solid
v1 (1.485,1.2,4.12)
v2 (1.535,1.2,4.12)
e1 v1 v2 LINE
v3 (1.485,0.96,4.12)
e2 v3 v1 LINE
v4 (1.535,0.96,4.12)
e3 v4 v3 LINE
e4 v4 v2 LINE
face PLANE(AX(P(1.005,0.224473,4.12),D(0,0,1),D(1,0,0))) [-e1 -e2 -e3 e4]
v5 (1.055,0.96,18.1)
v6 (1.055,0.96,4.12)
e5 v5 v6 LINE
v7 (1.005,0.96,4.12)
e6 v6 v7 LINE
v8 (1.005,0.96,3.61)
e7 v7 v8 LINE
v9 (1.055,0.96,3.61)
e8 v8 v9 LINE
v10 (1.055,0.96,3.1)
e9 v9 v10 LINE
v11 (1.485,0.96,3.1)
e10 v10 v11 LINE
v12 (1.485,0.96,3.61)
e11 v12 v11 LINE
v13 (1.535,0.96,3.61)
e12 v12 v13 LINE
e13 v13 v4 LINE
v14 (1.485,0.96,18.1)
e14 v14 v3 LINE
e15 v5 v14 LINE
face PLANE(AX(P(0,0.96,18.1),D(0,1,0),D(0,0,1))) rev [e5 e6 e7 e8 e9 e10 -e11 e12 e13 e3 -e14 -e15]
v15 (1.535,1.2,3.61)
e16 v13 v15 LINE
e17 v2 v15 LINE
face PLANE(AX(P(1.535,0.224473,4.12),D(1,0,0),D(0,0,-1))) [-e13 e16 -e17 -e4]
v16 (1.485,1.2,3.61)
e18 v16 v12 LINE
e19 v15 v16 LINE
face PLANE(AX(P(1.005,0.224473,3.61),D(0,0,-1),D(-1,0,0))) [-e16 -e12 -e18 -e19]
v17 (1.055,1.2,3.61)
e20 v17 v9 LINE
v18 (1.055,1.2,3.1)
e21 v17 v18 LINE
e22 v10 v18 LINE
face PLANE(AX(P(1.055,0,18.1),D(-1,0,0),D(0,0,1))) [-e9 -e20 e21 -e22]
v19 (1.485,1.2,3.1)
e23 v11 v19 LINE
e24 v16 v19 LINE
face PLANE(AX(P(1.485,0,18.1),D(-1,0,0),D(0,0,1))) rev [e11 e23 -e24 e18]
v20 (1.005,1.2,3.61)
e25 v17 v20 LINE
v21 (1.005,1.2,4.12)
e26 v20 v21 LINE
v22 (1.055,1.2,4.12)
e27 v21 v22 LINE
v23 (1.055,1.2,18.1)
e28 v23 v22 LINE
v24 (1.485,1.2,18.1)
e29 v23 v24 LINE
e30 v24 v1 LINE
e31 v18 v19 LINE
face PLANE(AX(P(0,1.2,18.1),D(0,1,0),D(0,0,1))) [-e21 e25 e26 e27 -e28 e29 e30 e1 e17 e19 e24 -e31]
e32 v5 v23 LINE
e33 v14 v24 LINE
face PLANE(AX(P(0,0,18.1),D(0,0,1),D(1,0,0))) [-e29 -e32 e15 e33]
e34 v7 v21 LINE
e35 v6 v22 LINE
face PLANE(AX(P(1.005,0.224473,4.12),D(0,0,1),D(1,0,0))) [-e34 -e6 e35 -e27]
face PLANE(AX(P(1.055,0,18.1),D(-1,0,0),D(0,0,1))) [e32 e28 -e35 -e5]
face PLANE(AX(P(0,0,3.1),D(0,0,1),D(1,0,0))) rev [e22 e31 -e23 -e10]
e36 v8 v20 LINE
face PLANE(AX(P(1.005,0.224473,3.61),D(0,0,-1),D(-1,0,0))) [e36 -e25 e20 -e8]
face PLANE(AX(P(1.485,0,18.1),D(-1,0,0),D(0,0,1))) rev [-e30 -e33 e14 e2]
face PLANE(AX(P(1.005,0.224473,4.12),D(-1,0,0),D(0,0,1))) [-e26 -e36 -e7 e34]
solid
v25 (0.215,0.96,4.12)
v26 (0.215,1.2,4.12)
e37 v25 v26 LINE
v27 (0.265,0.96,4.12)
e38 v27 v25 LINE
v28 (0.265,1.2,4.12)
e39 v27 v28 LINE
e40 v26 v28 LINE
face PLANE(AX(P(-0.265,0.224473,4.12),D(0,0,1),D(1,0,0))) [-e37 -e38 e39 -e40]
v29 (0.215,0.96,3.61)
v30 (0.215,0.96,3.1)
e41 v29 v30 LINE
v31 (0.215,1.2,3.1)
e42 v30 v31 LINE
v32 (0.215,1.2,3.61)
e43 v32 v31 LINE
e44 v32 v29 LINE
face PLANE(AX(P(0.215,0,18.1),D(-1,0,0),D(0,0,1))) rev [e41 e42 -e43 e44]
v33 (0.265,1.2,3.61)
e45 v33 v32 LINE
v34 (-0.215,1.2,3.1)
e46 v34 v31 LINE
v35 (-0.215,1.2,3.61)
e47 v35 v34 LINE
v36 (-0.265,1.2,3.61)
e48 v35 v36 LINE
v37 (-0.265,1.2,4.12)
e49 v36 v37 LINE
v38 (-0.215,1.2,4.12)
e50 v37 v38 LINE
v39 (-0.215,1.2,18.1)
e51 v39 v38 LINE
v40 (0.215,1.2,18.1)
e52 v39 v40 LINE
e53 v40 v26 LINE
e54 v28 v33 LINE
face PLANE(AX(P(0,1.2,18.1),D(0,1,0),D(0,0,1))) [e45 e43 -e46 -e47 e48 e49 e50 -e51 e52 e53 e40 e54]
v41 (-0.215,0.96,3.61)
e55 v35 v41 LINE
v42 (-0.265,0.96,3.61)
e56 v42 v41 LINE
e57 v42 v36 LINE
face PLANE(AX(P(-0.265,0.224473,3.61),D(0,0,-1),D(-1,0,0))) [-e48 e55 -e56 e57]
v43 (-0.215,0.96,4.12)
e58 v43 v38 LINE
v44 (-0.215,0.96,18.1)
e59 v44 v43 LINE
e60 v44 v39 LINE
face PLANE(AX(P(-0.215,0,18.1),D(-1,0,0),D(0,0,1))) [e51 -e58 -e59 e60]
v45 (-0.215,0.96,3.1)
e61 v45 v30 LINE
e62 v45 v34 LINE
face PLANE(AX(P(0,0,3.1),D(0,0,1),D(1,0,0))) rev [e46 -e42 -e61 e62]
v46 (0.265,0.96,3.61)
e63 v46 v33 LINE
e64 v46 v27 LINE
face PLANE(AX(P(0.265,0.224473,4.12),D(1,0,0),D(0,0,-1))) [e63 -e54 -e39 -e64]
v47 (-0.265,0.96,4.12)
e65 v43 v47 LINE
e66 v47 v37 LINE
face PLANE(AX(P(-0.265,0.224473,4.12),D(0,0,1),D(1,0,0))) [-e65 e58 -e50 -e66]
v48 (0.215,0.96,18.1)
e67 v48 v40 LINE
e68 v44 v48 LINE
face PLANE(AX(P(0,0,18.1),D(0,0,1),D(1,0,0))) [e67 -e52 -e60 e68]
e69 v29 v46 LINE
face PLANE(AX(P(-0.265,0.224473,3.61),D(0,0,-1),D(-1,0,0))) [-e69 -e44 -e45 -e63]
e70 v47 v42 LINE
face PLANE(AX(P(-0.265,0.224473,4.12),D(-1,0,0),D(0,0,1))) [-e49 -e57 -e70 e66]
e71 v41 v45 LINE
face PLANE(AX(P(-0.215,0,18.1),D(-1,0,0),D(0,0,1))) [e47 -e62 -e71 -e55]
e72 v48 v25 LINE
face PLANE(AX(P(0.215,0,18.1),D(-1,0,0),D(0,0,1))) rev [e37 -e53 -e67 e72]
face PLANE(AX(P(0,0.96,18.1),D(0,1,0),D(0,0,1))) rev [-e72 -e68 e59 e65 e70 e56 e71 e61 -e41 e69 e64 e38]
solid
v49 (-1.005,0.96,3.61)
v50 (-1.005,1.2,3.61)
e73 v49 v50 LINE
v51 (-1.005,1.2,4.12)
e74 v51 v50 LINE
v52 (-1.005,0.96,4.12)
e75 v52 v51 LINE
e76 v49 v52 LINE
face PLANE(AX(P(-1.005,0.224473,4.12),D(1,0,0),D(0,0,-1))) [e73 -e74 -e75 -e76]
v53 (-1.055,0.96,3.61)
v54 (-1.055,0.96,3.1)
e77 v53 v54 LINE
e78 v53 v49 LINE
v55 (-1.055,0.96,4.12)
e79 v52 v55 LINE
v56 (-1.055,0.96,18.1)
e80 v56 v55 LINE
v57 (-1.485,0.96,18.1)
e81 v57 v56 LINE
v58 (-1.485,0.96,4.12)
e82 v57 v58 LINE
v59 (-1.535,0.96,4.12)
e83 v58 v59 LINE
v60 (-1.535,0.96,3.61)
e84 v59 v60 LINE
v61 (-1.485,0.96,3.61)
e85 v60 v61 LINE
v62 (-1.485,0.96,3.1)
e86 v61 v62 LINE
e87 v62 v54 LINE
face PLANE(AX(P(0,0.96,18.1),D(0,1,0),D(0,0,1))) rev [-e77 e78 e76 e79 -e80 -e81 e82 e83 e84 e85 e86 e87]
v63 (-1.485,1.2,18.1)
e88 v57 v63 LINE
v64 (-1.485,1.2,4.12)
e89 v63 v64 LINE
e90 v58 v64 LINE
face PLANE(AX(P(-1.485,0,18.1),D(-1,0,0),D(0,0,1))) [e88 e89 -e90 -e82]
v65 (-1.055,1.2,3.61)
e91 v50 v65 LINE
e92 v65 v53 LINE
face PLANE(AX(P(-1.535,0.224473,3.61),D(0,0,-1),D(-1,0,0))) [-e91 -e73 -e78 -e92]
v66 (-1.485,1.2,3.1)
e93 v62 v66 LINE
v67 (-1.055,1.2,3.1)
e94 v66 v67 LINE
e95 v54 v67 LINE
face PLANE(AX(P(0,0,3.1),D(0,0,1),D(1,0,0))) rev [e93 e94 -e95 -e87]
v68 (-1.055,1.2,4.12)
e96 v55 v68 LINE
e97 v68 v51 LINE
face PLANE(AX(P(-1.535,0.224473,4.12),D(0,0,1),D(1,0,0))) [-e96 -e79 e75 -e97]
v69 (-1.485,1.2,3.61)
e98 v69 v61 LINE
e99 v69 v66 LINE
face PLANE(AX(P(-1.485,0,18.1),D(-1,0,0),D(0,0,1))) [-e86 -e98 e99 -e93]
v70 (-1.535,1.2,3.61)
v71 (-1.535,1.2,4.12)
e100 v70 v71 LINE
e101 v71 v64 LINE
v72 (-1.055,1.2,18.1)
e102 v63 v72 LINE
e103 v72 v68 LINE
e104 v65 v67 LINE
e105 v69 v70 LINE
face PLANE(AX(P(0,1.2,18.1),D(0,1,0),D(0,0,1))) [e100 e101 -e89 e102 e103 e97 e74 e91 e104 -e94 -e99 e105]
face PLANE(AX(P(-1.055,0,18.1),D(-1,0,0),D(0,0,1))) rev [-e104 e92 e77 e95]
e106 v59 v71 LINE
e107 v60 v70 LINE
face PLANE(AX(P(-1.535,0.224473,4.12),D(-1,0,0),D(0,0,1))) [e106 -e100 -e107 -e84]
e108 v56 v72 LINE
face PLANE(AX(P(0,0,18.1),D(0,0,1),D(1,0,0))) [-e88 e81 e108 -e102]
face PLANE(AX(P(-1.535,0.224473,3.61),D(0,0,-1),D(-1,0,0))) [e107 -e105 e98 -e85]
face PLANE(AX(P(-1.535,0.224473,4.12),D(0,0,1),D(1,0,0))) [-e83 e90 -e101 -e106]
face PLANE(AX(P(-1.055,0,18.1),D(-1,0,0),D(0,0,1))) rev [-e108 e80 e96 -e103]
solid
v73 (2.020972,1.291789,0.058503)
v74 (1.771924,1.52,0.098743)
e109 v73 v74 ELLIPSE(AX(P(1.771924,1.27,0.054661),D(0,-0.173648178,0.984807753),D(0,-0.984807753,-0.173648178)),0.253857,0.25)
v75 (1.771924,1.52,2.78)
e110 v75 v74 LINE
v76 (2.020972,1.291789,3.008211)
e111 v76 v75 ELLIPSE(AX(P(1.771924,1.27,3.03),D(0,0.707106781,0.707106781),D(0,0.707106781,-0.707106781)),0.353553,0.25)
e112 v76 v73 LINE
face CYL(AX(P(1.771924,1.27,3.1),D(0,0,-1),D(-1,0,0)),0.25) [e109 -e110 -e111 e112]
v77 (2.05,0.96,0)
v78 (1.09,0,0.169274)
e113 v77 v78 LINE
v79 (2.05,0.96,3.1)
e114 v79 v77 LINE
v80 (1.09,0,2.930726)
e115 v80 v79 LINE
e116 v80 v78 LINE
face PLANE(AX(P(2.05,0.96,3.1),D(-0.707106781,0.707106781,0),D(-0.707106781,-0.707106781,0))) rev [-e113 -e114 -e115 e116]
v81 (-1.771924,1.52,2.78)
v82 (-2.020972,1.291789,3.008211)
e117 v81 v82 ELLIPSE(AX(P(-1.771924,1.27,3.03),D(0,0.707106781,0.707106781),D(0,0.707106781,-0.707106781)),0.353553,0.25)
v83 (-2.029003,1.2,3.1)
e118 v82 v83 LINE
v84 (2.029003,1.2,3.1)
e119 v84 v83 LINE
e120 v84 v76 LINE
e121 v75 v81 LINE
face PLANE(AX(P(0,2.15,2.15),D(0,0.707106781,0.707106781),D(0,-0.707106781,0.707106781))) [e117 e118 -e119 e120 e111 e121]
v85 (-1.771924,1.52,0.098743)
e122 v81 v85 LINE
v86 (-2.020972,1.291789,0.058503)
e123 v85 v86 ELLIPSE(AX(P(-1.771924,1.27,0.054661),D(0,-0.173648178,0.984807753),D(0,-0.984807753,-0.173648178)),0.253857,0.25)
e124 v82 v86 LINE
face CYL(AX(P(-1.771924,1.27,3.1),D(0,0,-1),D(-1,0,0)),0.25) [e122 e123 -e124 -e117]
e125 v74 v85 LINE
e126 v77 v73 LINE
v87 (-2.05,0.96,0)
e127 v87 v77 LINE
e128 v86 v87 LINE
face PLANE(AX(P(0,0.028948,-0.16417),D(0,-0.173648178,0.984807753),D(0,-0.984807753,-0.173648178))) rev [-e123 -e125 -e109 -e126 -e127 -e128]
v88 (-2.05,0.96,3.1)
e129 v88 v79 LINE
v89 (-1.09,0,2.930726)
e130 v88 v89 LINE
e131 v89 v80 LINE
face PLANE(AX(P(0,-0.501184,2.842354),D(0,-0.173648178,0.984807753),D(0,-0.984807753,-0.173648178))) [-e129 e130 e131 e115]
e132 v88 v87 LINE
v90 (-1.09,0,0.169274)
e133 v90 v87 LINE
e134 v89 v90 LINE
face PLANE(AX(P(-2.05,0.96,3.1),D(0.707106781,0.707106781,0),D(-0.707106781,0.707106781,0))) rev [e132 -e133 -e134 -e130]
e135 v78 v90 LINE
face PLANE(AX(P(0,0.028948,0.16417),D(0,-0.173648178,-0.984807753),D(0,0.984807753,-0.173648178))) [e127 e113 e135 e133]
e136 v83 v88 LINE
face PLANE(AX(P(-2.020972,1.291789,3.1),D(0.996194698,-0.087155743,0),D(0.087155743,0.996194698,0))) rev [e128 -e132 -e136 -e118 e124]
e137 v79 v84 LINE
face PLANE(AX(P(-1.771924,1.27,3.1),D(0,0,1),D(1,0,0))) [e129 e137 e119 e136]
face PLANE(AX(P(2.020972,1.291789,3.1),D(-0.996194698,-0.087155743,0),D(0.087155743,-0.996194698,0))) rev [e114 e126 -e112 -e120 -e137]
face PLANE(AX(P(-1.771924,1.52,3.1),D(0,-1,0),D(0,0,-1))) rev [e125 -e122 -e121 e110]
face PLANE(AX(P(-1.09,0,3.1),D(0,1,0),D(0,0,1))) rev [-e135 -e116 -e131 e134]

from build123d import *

# Parameters (mm, degrees)
BOSS_EXTRUDE1_DEPTH     = 3.1
BOSS_EXTRUDE2_OUTLINE_W = 0.43
BOSS_EXTRUDE2_OUTLINE_H = 0.24
BOSS_EXTRUDE2_DEPTH     = 15
SKETCH4_W               = 0.53
SKETCH4_H               = 0.51
BOSS_EXTRUDE3_DEPTH     = 0.24


# Read off the part's stored shape, not the designer's step: Boss-Extrude2
with BuildPart() as part:
    # Sketch1 → Boss-Extrude1 (new body)
    with BuildSketch(Plane.XY):
        with BuildLine():
            Line((-1.771923555, 1.52), (1.771923555, 1.52))
            ThreePointArc((1.771923555, 1.52), (1.940821107, 1.454319334), (2.020972229, 1.291788936))
            Line((2.020972229, 1.291788936), (2.05, 0.96))
            Line((2.05, 0.96), (1.09, 0))
            Line((1.09, 0), (-1.09, 0))
            Line((-1.09, 0), (-2.05, 0.96))
            Line((-2.05, 0.96), (-2.020972229, 1.291788936))
            ThreePointArc((-2.020972229, 1.291788936), (-1.940821107, 1.454319334), (-1.771923555, 1.52))
        make_face()
    extrude(amount=BOSS_EXTRUDE1_DEPTH)

    # SurfaceCut1
    split(bisect_by=Plane(origin=(0, 0.028947542, 0.164169669), x_dir=(-1, 0, 0), z_dir=(0, -0.17364817766693072, -0.984807753012208)), keep=Keep.BOTTOM)

    # SurfaceCut2
    split(bisect_by=Plane(origin=(0, -0.50118368, 2.842353893), x_dir=(-1, 0, 0), z_dir=(0, -0.17364817766693072, 0.984807753012208)), keep=Keep.BOTTOM)

    # SurfaceCut3
    split(bisect_by=Plane(origin=(0, 2.15, 2.15), x_dir=(1, 0, 0), z_dir=(0, 0.7071067811865488, 0.7071067811865464)), keep=Keep.BOTTOM)

    # SurfaceCut4
    split(bisect_by=Plane(origin=(0, 0.028947542, -0.164169669), x_dir=(1, 0, 0), z_dir=(0, -0.17364817766693072, 0.984807753012208)), keep=Keep.TOP)


with BuildPart() as body_2:
    # Boss-Extrude2 outline → Boss-Extrude2 (new body)
    with BuildSketch(Plane.XY.offset(3.1)):
        with Locations((1.27, 1.08)):
            Rectangle(BOSS_EXTRUDE2_OUTLINE_W, BOSS_EXTRUDE2_OUTLINE_H)
        with Locations((0, 1.08)):
            Rectangle(BOSS_EXTRUDE2_OUTLINE_W, BOSS_EXTRUDE2_OUTLINE_H)
        with Locations((-1.27, 1.08)):
            Rectangle(BOSS_EXTRUDE2_OUTLINE_W, BOSS_EXTRUDE2_OUTLINE_H)
    extrude(amount=BOSS_EXTRUDE2_DEPTH)

    # Sketch4 → Boss-Extrude3 (add)
    with BuildSketch(Plane(origin=(0, 1.2, 0), x_dir=(1, 0, 0), z_dir=(0, 1, 0))):
        with Locations((-1.27, -3.865)):
            Rectangle(SKETCH4_W, SKETCH4_H)
        with Locations((0, -3.865)):
            Rectangle(SKETCH4_W, SKETCH4_H)
        with Locations((1.27, -3.865)):
            Rectangle(SKETCH4_W, SKETCH4_H)
    extrude(amount=-BOSS_EXTRUDE3_DEPTH)


solid = Compound([part.part, body_2.part])
